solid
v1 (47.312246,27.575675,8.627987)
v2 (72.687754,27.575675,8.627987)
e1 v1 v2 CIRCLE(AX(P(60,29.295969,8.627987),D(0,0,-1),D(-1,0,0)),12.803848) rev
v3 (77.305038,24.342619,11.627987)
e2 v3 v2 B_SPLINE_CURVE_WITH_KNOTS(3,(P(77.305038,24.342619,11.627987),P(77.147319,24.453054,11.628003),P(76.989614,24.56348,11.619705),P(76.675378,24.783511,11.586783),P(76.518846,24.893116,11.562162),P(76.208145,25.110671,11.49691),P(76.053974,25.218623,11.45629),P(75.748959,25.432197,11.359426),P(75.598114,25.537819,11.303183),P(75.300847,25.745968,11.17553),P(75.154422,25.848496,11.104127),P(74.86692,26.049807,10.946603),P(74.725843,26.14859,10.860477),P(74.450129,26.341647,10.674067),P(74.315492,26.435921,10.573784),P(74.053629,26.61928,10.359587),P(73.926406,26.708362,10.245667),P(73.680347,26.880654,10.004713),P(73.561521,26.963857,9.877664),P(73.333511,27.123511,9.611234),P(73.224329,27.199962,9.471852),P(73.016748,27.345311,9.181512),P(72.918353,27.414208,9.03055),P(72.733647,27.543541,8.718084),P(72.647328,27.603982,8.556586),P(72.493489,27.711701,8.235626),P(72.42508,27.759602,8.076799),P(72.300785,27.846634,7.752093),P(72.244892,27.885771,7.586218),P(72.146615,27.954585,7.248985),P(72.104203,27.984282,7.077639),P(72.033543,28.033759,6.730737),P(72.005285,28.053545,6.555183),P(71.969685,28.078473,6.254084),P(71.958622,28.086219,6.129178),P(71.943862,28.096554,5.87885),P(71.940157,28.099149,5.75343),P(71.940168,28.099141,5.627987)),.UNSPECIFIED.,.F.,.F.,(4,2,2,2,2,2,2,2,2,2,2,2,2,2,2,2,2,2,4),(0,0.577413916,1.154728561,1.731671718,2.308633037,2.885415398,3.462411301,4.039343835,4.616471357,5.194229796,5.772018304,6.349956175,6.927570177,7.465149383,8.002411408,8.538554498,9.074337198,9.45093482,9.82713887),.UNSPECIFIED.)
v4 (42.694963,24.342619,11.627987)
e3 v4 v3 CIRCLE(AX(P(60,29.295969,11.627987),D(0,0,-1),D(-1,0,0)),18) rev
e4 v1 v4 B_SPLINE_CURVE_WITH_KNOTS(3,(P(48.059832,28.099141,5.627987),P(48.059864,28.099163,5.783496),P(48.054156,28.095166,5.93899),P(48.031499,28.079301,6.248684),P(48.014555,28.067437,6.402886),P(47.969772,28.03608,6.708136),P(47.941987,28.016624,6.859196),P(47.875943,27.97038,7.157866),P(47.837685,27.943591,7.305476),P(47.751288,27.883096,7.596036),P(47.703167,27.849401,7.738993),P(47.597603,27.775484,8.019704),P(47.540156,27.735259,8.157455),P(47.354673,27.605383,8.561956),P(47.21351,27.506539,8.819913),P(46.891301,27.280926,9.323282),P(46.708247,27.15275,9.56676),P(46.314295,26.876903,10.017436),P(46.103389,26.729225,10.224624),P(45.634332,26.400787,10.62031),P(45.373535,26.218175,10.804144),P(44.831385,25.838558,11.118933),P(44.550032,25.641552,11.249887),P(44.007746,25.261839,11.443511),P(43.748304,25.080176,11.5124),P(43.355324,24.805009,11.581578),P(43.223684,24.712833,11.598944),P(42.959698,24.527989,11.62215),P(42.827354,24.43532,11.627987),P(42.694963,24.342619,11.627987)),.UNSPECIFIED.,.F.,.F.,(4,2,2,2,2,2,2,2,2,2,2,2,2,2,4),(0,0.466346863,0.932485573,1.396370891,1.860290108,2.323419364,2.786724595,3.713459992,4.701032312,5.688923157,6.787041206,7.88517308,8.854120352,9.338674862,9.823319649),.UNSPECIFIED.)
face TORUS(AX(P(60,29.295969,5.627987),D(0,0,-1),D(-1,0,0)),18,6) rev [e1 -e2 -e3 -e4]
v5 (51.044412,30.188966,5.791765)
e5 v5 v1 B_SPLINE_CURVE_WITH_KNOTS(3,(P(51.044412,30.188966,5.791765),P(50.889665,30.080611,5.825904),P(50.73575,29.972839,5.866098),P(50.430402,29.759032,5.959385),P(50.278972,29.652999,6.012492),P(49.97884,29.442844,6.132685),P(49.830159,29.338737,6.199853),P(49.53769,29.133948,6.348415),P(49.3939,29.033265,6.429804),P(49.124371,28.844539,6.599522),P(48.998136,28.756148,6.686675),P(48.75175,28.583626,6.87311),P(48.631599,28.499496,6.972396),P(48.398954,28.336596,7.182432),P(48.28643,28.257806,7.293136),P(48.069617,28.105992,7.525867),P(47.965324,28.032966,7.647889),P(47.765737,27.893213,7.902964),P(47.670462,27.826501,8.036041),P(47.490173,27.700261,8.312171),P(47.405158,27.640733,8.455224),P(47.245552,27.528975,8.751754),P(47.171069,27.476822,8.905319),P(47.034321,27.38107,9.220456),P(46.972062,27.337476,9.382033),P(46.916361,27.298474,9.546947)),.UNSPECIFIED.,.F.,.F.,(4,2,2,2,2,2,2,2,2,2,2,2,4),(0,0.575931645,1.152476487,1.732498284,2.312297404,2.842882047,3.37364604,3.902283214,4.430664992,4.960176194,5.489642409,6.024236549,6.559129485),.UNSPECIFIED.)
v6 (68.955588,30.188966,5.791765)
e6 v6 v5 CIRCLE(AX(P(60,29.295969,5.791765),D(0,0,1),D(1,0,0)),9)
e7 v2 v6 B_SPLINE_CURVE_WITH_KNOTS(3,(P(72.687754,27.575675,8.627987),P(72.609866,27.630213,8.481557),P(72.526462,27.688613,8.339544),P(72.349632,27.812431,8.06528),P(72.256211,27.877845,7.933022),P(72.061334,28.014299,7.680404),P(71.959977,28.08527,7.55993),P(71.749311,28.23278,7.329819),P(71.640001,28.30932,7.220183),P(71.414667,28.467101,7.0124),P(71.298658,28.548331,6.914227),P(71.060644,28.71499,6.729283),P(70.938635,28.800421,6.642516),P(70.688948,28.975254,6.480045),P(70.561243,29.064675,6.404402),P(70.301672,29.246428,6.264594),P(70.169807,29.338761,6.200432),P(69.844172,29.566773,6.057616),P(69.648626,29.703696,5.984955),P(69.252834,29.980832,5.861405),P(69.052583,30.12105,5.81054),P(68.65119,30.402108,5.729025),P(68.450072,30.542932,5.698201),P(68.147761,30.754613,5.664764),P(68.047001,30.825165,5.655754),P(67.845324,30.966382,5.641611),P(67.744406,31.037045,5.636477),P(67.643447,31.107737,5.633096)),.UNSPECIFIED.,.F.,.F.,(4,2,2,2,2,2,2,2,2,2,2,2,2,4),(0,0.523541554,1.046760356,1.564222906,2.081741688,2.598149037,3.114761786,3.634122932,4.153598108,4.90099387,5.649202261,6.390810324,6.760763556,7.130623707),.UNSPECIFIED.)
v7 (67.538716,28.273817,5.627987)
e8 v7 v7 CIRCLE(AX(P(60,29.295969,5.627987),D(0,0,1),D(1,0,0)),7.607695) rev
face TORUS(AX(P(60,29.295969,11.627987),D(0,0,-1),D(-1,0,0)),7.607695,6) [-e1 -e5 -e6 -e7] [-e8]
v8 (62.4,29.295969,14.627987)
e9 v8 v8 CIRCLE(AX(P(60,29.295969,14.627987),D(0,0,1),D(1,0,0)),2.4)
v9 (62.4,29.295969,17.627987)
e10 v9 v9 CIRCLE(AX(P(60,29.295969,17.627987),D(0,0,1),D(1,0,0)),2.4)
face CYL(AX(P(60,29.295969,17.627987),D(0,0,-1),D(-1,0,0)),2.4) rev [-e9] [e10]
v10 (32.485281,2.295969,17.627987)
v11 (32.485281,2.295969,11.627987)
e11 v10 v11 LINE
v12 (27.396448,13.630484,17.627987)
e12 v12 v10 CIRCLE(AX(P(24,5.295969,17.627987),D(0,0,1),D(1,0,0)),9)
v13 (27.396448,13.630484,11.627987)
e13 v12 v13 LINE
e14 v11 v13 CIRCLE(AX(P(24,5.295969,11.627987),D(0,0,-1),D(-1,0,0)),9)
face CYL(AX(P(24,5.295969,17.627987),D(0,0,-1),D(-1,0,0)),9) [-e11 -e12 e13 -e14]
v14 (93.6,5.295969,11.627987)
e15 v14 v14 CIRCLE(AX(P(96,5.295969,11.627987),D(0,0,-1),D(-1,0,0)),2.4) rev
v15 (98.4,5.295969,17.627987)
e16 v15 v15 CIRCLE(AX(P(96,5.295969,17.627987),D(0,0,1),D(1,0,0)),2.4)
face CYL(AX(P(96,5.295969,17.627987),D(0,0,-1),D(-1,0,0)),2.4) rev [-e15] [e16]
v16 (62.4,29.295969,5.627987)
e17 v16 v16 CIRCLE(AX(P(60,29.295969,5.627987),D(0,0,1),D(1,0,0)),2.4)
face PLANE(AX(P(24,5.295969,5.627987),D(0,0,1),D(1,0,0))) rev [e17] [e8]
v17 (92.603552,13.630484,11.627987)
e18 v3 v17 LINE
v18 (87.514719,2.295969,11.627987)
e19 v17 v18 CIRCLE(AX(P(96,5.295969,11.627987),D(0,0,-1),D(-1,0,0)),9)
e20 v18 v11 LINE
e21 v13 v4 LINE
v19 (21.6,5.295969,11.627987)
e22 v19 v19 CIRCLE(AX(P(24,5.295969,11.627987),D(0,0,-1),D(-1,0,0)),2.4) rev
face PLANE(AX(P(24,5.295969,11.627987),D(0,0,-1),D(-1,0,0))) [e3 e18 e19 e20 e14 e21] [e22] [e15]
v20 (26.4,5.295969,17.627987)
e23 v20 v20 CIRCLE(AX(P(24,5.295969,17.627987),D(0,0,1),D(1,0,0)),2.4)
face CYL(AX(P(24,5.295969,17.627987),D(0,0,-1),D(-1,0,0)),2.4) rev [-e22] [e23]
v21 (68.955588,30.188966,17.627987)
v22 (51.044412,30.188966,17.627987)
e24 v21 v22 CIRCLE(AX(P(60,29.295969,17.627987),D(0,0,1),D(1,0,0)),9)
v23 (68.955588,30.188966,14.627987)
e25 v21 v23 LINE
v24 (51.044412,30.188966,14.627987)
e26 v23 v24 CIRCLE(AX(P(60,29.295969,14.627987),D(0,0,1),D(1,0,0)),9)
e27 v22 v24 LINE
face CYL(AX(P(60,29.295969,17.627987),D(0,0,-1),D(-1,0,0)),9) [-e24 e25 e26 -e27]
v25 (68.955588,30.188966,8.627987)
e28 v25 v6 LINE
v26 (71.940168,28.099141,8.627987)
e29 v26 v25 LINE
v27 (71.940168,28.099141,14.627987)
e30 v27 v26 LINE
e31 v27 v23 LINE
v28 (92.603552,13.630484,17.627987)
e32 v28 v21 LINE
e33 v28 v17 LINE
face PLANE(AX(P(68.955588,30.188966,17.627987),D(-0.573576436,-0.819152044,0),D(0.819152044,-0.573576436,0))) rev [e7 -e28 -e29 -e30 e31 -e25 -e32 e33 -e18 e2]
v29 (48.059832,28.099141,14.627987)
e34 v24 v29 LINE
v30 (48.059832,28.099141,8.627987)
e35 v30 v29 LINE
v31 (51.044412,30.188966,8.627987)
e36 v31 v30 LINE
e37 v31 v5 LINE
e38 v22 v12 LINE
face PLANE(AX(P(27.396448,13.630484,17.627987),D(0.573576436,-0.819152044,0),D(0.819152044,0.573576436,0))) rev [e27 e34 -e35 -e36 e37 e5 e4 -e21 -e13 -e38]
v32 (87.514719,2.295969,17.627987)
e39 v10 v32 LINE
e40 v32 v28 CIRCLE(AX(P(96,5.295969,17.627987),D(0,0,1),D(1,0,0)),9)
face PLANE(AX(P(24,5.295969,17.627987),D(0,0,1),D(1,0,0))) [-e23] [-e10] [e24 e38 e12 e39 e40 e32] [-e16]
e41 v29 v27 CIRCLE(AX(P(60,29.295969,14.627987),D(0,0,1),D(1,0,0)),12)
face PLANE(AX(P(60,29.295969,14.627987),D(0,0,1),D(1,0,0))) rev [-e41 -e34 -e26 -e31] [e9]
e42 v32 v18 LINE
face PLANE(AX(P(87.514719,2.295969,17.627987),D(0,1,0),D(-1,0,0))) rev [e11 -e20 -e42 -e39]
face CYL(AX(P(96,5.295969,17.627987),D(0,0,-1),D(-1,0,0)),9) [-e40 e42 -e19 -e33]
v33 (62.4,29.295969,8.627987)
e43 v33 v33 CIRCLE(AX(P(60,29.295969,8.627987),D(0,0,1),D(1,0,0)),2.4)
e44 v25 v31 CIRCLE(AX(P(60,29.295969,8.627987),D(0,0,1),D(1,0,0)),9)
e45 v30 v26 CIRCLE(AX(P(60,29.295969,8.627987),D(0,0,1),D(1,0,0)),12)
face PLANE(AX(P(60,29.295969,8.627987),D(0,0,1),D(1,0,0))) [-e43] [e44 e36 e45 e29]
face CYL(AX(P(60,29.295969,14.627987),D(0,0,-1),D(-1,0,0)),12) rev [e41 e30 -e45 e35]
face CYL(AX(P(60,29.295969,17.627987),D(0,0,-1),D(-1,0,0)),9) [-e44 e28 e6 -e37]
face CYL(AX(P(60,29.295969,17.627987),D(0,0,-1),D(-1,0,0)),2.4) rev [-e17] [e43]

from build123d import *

# Parameters (mm, degrees)
SKETCH1_R               = 4
BOSS_EXTRUDE1_DEPTH     = 20
SKETCH2_R               = 4
CUT_EXTRUDE1_DEPTH      = 10
FILLET2_R               = 10
CUT_EXTRUDE2_DEPTH      = 5
CUT_EXTRUDE2_DEPTH_BACK = 5
SKETCH5_R               = 20
ECHELLE1_SCALE          = 0.6


with BuildPart() as part:
    # Sketch1 → Boss-Extrude1 (new body)
    with BuildSketch(Plane.XY):
        with BuildLine():
            Line((5.660747058, 13.890858244), (45.074020085, 41.488329122))
            ThreePointArc((45.074020085, 41.488329122), (60, 55), (74.925979915, 41.488329122))
            Line((74.925979915, 41.488329122), (114.339252942, 13.890858244))
            ThreePointArc((114.339252942, 13.890858244), (133.684102891, -6.143722656), (105.857864376, -5))
            Line((105.857864376, -5), (14.142135624, -5))
            ThreePointArc((14.142135624, -5), (-13.684102891, -6.143722656), (5.660747058, 13.890858244))
        make_face()
        with Locations((60, 40)):
            Circle(SKETCH1_R, mode=Mode.SUBTRACT)
        with Locations((120, 0)):
            Circle(SKETCH1_R, mode=Mode.SUBTRACT)
        Circle(SKETCH1_R, mode=Mode.SUBTRACT)
    extrude(amount=BOSS_EXTRUDE1_DEPTH)

    # Sketch2 → Cut-Extrude1 (cut)
    with BuildSketch(Plane(origin=(0, 0, 0), x_dir=(-1, 0, 0), z_dir=(0, 0, -1))):
        with BuildLine():
            ThreePointArc((-40.099720592, 38.00528712), (-60, 20), (-79.900279408, 38.00528712))
            Line((-79.900279408, 38.00528712), (-114.339252942, 13.890858244))
            ThreePointArc((-114.339252942, 13.890858244), (-133.684102891, -6.143722656), (-105.857864376, -5))
            Line((-105.857864376, -5), (-14.142135624, -5))
            ThreePointArc((-14.142135624, -5), (13.684102891, -6.143722656), (-5.660747058, 13.890858244))
            Line((-5.660747058, 13.890858244), (-40.099720592, 38.00528712))
        make_face()
        with Locations((-120, 0)):
            Circle(SKETCH2_R, mode=Mode.SUBTRACT)
        Circle(SKETCH2_R, mode=Mode.SUBTRACT)
    extrude(amount=-CUT_EXTRUDE1_DEPTH, mode=Mode.SUBTRACT)

    # Fillet2
    fillet2_edges = [part.edges().sort_by_distance(p)[0] for p in [
        (60, 20, 10),
    ]]
    fillet(fillet2_edges, radius=FILLET2_R - 0.0001)  # a hair under: the kernel refuses the full size

    # Fillet3: read off the stored shape, not the designer's step
    # Fillet3 outline → Fillet3 (revolve, cut)
    with BuildSketch(Plane(origin=(60, 40, 0), x_dir=(1, 0, 0), z_dir=(0, -1, 0))):
        with BuildLine():
            Line((21.33974599, 0), (21.33974599, 5.000000048))
            ThreePointArc((21.33974599, 5.000000048), (17.679491948, 1.339745976), (12.679491924, 0))
            Line((12.679491924, 0), (21.33974599, 0))
        make_face()
    revolve(axis=Axis((60, 40, 0), (0, 0, 1)), mode=Mode.SUBTRACT)

    # Sketch5 → Cut-Extrude2 (cut, two sides: drawn at the far end of the back side and taken through both)
    with BuildSketch(Plane.XY.offset(10).offset(-CUT_EXTRUDE2_DEPTH_BACK)):
        with Locations((60, 40)):
            Circle(SKETCH5_R)
    extrude(amount=CUT_EXTRUDE2_DEPTH + CUT_EXTRUDE2_DEPTH_BACK, mode=Mode.SUBTRACT)


with BuildPart() as part_1:
    # Echelle1: scaled about (60.000000152, 13.239920992, 14.069971935)
    add(part.part.scale(ECHELLE1_SCALE).moved(Location((24.000000061, 5.295968397, 5.627988774))))


solid = part_1.part
